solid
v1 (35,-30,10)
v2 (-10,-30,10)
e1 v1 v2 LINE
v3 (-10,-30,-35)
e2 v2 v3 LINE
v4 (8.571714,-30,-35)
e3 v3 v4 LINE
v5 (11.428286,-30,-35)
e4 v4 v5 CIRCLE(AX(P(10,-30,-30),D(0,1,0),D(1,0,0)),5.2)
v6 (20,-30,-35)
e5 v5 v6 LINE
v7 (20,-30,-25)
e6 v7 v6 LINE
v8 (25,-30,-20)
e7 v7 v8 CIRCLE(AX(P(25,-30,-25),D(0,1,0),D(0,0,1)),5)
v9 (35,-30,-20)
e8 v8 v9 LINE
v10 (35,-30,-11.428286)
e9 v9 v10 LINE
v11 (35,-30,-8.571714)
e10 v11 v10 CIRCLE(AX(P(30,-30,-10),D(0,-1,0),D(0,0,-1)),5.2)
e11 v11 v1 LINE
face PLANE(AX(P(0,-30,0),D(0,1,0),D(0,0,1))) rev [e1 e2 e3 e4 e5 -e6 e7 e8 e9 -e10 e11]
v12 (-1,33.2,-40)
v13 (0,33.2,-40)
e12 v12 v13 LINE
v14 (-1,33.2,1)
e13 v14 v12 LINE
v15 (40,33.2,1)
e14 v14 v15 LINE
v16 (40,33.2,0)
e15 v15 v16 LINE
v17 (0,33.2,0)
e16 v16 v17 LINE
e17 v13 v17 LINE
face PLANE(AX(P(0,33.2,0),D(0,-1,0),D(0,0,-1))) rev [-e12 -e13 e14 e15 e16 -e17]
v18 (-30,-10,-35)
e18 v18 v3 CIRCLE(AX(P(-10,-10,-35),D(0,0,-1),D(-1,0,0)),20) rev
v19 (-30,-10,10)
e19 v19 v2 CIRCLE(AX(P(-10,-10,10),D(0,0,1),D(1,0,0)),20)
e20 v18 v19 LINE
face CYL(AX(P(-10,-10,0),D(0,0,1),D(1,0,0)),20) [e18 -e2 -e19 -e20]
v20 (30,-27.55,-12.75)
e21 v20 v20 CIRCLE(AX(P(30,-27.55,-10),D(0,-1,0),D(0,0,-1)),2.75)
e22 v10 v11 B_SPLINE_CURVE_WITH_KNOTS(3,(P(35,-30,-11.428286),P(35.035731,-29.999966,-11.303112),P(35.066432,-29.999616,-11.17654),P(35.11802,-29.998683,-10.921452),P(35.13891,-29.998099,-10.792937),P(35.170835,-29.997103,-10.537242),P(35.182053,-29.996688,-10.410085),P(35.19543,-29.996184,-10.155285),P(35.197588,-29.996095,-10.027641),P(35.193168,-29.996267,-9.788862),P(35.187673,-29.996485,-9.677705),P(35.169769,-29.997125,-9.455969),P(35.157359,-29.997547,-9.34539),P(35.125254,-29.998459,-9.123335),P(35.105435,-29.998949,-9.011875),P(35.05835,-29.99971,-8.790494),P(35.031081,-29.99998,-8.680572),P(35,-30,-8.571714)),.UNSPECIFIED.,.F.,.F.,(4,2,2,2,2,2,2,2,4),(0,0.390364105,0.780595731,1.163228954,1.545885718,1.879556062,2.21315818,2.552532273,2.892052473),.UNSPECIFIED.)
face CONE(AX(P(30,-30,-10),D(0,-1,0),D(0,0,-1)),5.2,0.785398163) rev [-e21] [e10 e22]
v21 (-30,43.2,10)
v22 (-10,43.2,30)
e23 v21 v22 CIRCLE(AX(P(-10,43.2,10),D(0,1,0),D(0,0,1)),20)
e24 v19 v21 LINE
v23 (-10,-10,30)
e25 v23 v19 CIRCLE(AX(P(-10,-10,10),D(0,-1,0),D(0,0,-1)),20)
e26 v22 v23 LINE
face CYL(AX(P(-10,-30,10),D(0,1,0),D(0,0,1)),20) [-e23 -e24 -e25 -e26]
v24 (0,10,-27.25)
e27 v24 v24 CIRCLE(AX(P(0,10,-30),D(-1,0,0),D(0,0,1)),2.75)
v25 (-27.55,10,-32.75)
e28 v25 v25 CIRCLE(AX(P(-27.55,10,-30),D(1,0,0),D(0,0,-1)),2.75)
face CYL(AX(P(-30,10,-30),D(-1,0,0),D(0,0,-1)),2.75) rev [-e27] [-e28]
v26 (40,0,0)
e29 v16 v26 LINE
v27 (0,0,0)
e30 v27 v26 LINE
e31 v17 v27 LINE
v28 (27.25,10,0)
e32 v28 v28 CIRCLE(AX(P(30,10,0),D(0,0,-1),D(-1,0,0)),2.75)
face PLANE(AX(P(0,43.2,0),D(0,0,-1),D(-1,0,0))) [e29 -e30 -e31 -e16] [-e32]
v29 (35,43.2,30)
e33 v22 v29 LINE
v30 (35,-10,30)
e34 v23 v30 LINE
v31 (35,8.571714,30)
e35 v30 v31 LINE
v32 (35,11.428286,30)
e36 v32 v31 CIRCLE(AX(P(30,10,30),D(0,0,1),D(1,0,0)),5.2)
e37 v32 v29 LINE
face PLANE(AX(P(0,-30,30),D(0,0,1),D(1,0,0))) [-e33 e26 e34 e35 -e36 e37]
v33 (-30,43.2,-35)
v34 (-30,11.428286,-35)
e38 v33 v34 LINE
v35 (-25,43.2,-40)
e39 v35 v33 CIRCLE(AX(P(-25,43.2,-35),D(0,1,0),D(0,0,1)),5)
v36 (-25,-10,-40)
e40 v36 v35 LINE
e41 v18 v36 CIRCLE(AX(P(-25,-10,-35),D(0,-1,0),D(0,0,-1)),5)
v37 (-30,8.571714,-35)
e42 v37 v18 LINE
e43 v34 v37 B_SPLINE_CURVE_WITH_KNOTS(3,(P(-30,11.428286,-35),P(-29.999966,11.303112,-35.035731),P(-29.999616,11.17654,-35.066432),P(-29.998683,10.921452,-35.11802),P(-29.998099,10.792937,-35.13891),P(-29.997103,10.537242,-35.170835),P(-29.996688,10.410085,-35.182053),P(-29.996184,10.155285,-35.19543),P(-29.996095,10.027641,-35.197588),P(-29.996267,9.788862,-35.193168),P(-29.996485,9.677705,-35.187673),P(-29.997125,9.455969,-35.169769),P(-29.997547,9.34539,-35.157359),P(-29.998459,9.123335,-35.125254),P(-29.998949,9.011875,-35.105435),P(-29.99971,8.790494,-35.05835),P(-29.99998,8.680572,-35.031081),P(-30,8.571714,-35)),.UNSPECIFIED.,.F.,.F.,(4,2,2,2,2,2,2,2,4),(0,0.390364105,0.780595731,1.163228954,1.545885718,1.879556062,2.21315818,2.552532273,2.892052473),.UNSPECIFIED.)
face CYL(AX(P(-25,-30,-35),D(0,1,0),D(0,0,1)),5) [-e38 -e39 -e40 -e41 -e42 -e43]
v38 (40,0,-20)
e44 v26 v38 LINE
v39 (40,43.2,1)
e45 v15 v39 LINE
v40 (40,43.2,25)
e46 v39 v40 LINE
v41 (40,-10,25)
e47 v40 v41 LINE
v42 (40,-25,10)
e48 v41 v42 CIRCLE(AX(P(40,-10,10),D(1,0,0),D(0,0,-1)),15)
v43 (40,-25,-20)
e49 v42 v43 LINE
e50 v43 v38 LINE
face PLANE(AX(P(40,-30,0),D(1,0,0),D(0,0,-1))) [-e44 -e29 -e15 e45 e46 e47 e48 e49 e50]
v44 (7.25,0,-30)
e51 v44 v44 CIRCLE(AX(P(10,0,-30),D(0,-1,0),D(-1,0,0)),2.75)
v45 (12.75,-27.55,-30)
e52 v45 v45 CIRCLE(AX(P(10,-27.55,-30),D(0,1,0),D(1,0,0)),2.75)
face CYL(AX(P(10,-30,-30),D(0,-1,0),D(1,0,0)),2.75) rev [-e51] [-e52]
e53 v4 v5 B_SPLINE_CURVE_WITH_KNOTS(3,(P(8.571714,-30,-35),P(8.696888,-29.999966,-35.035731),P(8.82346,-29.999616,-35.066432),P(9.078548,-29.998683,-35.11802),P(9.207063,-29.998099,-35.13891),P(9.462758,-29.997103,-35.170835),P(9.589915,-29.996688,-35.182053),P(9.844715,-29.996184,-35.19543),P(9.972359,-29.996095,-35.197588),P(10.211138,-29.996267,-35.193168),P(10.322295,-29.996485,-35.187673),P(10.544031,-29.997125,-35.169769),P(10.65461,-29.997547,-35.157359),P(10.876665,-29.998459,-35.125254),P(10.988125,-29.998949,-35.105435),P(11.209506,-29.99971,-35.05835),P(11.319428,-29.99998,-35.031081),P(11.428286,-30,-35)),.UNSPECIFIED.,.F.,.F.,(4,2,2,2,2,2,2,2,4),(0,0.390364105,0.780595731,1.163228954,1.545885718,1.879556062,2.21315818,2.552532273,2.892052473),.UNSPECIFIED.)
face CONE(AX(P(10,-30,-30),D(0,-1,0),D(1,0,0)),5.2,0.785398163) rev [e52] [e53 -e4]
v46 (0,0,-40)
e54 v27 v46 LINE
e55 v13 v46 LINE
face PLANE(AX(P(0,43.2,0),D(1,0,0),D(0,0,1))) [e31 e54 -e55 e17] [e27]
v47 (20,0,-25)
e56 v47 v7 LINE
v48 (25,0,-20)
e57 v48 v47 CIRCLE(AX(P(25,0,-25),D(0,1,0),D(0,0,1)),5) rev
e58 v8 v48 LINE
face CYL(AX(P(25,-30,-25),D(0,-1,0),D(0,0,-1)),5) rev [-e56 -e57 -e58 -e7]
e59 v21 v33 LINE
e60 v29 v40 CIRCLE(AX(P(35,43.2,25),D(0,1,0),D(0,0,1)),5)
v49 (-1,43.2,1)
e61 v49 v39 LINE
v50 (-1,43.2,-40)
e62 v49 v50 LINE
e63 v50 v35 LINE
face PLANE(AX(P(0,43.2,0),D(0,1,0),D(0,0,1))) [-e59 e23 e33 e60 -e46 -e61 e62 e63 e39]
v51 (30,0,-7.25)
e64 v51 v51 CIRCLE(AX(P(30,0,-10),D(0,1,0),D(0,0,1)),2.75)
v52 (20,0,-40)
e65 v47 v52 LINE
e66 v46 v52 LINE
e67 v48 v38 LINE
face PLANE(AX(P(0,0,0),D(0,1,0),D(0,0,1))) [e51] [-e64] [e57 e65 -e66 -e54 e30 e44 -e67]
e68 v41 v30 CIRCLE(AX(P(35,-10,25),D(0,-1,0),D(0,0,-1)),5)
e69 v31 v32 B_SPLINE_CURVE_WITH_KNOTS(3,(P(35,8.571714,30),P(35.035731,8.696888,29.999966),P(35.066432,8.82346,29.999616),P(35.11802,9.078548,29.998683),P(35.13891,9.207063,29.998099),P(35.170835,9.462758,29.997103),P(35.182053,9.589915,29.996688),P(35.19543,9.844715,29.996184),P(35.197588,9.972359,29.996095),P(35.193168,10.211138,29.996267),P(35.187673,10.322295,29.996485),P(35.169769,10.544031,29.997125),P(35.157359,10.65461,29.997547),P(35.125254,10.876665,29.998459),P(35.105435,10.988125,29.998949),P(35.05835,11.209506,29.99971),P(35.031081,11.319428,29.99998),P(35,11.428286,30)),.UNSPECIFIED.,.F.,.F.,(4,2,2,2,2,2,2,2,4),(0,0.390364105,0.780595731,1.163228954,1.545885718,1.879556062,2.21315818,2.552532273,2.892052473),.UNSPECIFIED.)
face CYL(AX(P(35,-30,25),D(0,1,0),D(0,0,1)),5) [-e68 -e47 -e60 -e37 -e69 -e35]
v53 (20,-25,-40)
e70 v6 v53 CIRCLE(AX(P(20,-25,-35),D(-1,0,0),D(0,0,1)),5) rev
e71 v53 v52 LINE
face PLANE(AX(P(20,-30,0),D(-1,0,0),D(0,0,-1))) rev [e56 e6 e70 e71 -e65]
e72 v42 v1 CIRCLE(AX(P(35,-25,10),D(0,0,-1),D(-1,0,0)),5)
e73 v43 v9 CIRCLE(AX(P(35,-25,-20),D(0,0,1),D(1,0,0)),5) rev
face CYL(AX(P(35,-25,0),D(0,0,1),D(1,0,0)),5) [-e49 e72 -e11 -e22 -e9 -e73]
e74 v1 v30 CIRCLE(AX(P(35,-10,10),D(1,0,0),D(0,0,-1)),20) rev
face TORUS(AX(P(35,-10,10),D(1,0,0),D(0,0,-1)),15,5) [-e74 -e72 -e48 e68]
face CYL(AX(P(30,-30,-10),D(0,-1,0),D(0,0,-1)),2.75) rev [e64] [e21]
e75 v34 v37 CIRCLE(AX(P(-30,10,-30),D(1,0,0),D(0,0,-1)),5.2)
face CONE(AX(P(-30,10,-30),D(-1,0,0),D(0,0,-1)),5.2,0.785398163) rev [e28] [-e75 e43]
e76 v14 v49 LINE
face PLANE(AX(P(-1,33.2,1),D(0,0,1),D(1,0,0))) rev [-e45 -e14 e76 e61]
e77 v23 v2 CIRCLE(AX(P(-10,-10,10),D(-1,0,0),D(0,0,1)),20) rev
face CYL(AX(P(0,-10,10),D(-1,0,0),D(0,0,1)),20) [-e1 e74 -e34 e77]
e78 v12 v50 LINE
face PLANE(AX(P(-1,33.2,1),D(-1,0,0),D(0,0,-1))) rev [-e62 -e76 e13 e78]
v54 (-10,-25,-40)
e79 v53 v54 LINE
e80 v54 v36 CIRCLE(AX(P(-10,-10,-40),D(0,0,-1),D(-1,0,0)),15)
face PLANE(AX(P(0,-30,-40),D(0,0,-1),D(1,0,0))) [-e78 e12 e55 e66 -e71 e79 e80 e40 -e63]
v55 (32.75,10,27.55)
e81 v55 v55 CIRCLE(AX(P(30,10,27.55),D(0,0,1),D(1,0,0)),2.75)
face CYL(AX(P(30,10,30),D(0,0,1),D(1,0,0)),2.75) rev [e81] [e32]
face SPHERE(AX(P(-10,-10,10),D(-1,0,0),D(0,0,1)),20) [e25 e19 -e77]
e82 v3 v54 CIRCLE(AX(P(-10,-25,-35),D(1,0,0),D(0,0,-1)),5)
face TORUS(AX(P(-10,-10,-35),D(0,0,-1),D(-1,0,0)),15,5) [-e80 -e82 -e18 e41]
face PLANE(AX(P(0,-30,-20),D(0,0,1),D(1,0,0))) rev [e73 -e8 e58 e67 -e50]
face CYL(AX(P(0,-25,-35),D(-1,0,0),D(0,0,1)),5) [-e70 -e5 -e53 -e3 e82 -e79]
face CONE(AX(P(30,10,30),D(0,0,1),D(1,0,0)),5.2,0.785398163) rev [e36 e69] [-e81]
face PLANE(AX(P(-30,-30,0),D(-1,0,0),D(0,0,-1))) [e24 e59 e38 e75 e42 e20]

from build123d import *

# Parameters (mm, degrees)
BOSS_EXTRUDE1_DEPTH                             = 30
BOSS_EXTRUDE2_DEPTH                             = 43.2
CSK_FOR_M5_FLAT_HEAD_MACHINE_SCREW1_D           = 5.5
CSK_FOR_M5_FLAT_HEAD_MACHINE_SCREW1_CSINK_D     = 10.4
CSK_FOR_M5_FLAT_HEAD_MACHINE_SCREW1_CSINK_ANGLE = 90
CSK_FOR_M5_FLAT_HEAD_MACHINE_SCREW2_D           = 5.5
CSK_FOR_M5_FLAT_HEAD_MACHINE_SCREW2_CSINK_D     = 10.4
CSK_FOR_M5_FLAT_HEAD_MACHINE_SCREW2_CSINK_ANGLE = 90
CUT_EXTRUDE1_DEPTH                              = 10
FILLET3_R                                       = 20
FILLET4_R                                       = 5


with BuildPart() as part:
    # Sketch1 → Boss-Extrude1 (new body)
    with BuildSketch(Plane(origin=(0, 0, 0), x_dir=(1, 0, 0), z_dir=(0, 1, 0))):
        Polygon((20, 20), (0, 0), (40, 0), (40, 20), align=None)
        Polygon((40, 0), (0, 0), (-30, -30), (40, -30), align=None)
    extrude(amount=-BOSS_EXTRUDE1_DEPTH)

    # Sketch1<3> → Boss-Extrude2 (add)
    with BuildSketch(Plane(origin=(0, 0, 0), x_dir=(1, 0, 0), z_dir=(0, 1, 0))):
        Polygon((40, 0), (0, 0), (-30, -30), (40, -30), align=None)
    extrude(amount=BOSS_EXTRUDE2_DEPTH)

    # CSK for M5 Flat Head Machine Screw1 (through all)
    with Locations(Plane.XY.offset(30)):
        with Locations((30, 10)):
            CounterSinkHole(CSK_FOR_M5_FLAT_HEAD_MACHINE_SCREW1_D / 2, CSK_FOR_M5_FLAT_HEAD_MACHINE_SCREW1_CSINK_D / 2, counter_sink_angle=CSK_FOR_M5_FLAT_HEAD_MACHINE_SCREW1_CSINK_ANGLE)

    # CSK for M5 Flat Head Machine Screw2 (through all)
    with Locations(Plane(origin=(0, -30, 0), x_dir=(-1, 0, 0), z_dir=(0, -1, 0))):
        with Locations((-30, 10)):
            CounterSinkHole(CSK_FOR_M5_FLAT_HEAD_MACHINE_SCREW2_D / 2, CSK_FOR_M5_FLAT_HEAD_MACHINE_SCREW2_CSINK_D / 2, counter_sink_angle=CSK_FOR_M5_FLAT_HEAD_MACHINE_SCREW2_CSINK_ANGLE)

    # Sketch10 → Cut-Extrude1 (cut)
    with BuildSketch(Plane(origin=(0, 43.2, 0), x_dir=(1, 0, 0), z_dir=(0, 1, 0))):
        Polygon((0, 0), (-1, -1), (40, -1), (40, 0), align=None)
    extrude(amount=-CUT_EXTRUDE1_DEPTH, mode=Mode.SUBTRACT)

    # Mirror2: part across plane


with BuildPart() as part_1:
    add(part.part)
    add(part.part.mirror(Plane(origin=(0, -30, 0), x_dir=(-0.7071067811865513, 0, 0.7071067811865438), z_dir=(-0.7071067811865439, 0, -0.7071067811865512))))

    # Fillet3
    fillet3_edges = [part_1.edges().sort_by_distance(p)[0] for p in [
        (5, -30, 30),
        (-30, 6.6, 30),
        (-30, -30, -5),
    ]]
    fillet(fillet3_edges, radius=FILLET3_R)

    # Fillet4
    # the kernel refuses this fillet: 5 mm, written as the material it adds along each edge
    with BuildSketch(Plane(origin=(20, 0, -20), x_dir=(1, 0, 0), z_dir=(0, -1, 0))) as fillet4_piece_1:
        with BuildLine():
            CenterArc((FILLET4_R, -FILLET4_R), FILLET4_R, 90, 90)
            Line((0, -FILLET4_R), (0, 0))
            Line((0, 0), (FILLET4_R, 0))
        make_face()
    extrude(amount=30)
    # the kernel refuses this fillet: 5 mm, written as the material it takes off along each edge
    with BuildSketch(Plane(origin=(40, -10, 30), x_dir=(0, 0, -1), z_dir=(0, 1, 0))) as fillet4_2_piece_1:
        with BuildLine():
            CenterArc((FILLET4_R, FILLET4_R), FILLET4_R, 180, 90)
            Line((0, FILLET4_R), (0, 0))
            Line((0, 0), (FILLET4_R, 0))
        make_face()
    extrude(amount=65.7, mode=Mode.SUBTRACT)
    with BuildSketch(Plane(origin=(40, -30, -32.5), x_dir=(0, 1, 0), z_dir=(0, 0, 1)), Plane(origin=(32.5, -30, -40), x_dir=(0, 0, 1), z_dir=(-1, 0, 0))) as fillet4_2_piece_2:
        with BuildLine():
            CenterArc((FILLET4_R, FILLET4_R), FILLET4_R, 180, 90)
            Line((0, FILLET4_R), (0, 0))
            Line((0, 0), (FILLET4_R, 0))
        make_face()
    extrude(amount=42.5, mode=Mode.SUBTRACT)
    with BuildSketch(Plane(origin=(40, -10, 10), x_dir=(0, -1, 0), z_dir=(0, 0, -1))) as fillet4_2_piece_3:
        with BuildLine():
            CenterArc((20 - FILLET4_R, FILLET4_R), FILLET4_R, 270, 90)
            Line((20, FILLET4_R), (20, 0))
            Line((20, 0), (20 - FILLET4_R, 0))
        make_face()
    revolve(axis=Axis((40, -10, 10), (-1, 0, 0)), revolution_arc=90, mode=Mode.SUBTRACT)
    with BuildSketch(Plane(origin=(-30, -10, -40), x_dir=(1, 0, 0), z_dir=(0, 1, 0))) as fillet4_2_piece_4:
        with BuildLine():
            CenterArc((FILLET4_R, -FILLET4_R), FILLET4_R, 90, 90)
            Line((0, -FILLET4_R), (0, 0))
            Line((0, 0), (FILLET4_R, 0))
        make_face()
    extrude(amount=65.7, mode=Mode.SUBTRACT)
    with BuildSketch(Plane(origin=(-10, -10, -40), x_dir=(0, -1, 0), z_dir=(1, 0, 0))) as fillet4_2_piece_5:
        with BuildLine():
            CenterArc((20 - FILLET4_R, -FILLET4_R), FILLET4_R, 0, 90)
            Line((20 - FILLET4_R, 0), (20, 0))
            Line((20, 0), (20, -FILLET4_R))
        make_face()
    revolve(axis=Axis((-10, -10, -40), (0, 0, -1)), revolution_arc=90, mode=Mode.SUBTRACT)


solid = part_1.part
